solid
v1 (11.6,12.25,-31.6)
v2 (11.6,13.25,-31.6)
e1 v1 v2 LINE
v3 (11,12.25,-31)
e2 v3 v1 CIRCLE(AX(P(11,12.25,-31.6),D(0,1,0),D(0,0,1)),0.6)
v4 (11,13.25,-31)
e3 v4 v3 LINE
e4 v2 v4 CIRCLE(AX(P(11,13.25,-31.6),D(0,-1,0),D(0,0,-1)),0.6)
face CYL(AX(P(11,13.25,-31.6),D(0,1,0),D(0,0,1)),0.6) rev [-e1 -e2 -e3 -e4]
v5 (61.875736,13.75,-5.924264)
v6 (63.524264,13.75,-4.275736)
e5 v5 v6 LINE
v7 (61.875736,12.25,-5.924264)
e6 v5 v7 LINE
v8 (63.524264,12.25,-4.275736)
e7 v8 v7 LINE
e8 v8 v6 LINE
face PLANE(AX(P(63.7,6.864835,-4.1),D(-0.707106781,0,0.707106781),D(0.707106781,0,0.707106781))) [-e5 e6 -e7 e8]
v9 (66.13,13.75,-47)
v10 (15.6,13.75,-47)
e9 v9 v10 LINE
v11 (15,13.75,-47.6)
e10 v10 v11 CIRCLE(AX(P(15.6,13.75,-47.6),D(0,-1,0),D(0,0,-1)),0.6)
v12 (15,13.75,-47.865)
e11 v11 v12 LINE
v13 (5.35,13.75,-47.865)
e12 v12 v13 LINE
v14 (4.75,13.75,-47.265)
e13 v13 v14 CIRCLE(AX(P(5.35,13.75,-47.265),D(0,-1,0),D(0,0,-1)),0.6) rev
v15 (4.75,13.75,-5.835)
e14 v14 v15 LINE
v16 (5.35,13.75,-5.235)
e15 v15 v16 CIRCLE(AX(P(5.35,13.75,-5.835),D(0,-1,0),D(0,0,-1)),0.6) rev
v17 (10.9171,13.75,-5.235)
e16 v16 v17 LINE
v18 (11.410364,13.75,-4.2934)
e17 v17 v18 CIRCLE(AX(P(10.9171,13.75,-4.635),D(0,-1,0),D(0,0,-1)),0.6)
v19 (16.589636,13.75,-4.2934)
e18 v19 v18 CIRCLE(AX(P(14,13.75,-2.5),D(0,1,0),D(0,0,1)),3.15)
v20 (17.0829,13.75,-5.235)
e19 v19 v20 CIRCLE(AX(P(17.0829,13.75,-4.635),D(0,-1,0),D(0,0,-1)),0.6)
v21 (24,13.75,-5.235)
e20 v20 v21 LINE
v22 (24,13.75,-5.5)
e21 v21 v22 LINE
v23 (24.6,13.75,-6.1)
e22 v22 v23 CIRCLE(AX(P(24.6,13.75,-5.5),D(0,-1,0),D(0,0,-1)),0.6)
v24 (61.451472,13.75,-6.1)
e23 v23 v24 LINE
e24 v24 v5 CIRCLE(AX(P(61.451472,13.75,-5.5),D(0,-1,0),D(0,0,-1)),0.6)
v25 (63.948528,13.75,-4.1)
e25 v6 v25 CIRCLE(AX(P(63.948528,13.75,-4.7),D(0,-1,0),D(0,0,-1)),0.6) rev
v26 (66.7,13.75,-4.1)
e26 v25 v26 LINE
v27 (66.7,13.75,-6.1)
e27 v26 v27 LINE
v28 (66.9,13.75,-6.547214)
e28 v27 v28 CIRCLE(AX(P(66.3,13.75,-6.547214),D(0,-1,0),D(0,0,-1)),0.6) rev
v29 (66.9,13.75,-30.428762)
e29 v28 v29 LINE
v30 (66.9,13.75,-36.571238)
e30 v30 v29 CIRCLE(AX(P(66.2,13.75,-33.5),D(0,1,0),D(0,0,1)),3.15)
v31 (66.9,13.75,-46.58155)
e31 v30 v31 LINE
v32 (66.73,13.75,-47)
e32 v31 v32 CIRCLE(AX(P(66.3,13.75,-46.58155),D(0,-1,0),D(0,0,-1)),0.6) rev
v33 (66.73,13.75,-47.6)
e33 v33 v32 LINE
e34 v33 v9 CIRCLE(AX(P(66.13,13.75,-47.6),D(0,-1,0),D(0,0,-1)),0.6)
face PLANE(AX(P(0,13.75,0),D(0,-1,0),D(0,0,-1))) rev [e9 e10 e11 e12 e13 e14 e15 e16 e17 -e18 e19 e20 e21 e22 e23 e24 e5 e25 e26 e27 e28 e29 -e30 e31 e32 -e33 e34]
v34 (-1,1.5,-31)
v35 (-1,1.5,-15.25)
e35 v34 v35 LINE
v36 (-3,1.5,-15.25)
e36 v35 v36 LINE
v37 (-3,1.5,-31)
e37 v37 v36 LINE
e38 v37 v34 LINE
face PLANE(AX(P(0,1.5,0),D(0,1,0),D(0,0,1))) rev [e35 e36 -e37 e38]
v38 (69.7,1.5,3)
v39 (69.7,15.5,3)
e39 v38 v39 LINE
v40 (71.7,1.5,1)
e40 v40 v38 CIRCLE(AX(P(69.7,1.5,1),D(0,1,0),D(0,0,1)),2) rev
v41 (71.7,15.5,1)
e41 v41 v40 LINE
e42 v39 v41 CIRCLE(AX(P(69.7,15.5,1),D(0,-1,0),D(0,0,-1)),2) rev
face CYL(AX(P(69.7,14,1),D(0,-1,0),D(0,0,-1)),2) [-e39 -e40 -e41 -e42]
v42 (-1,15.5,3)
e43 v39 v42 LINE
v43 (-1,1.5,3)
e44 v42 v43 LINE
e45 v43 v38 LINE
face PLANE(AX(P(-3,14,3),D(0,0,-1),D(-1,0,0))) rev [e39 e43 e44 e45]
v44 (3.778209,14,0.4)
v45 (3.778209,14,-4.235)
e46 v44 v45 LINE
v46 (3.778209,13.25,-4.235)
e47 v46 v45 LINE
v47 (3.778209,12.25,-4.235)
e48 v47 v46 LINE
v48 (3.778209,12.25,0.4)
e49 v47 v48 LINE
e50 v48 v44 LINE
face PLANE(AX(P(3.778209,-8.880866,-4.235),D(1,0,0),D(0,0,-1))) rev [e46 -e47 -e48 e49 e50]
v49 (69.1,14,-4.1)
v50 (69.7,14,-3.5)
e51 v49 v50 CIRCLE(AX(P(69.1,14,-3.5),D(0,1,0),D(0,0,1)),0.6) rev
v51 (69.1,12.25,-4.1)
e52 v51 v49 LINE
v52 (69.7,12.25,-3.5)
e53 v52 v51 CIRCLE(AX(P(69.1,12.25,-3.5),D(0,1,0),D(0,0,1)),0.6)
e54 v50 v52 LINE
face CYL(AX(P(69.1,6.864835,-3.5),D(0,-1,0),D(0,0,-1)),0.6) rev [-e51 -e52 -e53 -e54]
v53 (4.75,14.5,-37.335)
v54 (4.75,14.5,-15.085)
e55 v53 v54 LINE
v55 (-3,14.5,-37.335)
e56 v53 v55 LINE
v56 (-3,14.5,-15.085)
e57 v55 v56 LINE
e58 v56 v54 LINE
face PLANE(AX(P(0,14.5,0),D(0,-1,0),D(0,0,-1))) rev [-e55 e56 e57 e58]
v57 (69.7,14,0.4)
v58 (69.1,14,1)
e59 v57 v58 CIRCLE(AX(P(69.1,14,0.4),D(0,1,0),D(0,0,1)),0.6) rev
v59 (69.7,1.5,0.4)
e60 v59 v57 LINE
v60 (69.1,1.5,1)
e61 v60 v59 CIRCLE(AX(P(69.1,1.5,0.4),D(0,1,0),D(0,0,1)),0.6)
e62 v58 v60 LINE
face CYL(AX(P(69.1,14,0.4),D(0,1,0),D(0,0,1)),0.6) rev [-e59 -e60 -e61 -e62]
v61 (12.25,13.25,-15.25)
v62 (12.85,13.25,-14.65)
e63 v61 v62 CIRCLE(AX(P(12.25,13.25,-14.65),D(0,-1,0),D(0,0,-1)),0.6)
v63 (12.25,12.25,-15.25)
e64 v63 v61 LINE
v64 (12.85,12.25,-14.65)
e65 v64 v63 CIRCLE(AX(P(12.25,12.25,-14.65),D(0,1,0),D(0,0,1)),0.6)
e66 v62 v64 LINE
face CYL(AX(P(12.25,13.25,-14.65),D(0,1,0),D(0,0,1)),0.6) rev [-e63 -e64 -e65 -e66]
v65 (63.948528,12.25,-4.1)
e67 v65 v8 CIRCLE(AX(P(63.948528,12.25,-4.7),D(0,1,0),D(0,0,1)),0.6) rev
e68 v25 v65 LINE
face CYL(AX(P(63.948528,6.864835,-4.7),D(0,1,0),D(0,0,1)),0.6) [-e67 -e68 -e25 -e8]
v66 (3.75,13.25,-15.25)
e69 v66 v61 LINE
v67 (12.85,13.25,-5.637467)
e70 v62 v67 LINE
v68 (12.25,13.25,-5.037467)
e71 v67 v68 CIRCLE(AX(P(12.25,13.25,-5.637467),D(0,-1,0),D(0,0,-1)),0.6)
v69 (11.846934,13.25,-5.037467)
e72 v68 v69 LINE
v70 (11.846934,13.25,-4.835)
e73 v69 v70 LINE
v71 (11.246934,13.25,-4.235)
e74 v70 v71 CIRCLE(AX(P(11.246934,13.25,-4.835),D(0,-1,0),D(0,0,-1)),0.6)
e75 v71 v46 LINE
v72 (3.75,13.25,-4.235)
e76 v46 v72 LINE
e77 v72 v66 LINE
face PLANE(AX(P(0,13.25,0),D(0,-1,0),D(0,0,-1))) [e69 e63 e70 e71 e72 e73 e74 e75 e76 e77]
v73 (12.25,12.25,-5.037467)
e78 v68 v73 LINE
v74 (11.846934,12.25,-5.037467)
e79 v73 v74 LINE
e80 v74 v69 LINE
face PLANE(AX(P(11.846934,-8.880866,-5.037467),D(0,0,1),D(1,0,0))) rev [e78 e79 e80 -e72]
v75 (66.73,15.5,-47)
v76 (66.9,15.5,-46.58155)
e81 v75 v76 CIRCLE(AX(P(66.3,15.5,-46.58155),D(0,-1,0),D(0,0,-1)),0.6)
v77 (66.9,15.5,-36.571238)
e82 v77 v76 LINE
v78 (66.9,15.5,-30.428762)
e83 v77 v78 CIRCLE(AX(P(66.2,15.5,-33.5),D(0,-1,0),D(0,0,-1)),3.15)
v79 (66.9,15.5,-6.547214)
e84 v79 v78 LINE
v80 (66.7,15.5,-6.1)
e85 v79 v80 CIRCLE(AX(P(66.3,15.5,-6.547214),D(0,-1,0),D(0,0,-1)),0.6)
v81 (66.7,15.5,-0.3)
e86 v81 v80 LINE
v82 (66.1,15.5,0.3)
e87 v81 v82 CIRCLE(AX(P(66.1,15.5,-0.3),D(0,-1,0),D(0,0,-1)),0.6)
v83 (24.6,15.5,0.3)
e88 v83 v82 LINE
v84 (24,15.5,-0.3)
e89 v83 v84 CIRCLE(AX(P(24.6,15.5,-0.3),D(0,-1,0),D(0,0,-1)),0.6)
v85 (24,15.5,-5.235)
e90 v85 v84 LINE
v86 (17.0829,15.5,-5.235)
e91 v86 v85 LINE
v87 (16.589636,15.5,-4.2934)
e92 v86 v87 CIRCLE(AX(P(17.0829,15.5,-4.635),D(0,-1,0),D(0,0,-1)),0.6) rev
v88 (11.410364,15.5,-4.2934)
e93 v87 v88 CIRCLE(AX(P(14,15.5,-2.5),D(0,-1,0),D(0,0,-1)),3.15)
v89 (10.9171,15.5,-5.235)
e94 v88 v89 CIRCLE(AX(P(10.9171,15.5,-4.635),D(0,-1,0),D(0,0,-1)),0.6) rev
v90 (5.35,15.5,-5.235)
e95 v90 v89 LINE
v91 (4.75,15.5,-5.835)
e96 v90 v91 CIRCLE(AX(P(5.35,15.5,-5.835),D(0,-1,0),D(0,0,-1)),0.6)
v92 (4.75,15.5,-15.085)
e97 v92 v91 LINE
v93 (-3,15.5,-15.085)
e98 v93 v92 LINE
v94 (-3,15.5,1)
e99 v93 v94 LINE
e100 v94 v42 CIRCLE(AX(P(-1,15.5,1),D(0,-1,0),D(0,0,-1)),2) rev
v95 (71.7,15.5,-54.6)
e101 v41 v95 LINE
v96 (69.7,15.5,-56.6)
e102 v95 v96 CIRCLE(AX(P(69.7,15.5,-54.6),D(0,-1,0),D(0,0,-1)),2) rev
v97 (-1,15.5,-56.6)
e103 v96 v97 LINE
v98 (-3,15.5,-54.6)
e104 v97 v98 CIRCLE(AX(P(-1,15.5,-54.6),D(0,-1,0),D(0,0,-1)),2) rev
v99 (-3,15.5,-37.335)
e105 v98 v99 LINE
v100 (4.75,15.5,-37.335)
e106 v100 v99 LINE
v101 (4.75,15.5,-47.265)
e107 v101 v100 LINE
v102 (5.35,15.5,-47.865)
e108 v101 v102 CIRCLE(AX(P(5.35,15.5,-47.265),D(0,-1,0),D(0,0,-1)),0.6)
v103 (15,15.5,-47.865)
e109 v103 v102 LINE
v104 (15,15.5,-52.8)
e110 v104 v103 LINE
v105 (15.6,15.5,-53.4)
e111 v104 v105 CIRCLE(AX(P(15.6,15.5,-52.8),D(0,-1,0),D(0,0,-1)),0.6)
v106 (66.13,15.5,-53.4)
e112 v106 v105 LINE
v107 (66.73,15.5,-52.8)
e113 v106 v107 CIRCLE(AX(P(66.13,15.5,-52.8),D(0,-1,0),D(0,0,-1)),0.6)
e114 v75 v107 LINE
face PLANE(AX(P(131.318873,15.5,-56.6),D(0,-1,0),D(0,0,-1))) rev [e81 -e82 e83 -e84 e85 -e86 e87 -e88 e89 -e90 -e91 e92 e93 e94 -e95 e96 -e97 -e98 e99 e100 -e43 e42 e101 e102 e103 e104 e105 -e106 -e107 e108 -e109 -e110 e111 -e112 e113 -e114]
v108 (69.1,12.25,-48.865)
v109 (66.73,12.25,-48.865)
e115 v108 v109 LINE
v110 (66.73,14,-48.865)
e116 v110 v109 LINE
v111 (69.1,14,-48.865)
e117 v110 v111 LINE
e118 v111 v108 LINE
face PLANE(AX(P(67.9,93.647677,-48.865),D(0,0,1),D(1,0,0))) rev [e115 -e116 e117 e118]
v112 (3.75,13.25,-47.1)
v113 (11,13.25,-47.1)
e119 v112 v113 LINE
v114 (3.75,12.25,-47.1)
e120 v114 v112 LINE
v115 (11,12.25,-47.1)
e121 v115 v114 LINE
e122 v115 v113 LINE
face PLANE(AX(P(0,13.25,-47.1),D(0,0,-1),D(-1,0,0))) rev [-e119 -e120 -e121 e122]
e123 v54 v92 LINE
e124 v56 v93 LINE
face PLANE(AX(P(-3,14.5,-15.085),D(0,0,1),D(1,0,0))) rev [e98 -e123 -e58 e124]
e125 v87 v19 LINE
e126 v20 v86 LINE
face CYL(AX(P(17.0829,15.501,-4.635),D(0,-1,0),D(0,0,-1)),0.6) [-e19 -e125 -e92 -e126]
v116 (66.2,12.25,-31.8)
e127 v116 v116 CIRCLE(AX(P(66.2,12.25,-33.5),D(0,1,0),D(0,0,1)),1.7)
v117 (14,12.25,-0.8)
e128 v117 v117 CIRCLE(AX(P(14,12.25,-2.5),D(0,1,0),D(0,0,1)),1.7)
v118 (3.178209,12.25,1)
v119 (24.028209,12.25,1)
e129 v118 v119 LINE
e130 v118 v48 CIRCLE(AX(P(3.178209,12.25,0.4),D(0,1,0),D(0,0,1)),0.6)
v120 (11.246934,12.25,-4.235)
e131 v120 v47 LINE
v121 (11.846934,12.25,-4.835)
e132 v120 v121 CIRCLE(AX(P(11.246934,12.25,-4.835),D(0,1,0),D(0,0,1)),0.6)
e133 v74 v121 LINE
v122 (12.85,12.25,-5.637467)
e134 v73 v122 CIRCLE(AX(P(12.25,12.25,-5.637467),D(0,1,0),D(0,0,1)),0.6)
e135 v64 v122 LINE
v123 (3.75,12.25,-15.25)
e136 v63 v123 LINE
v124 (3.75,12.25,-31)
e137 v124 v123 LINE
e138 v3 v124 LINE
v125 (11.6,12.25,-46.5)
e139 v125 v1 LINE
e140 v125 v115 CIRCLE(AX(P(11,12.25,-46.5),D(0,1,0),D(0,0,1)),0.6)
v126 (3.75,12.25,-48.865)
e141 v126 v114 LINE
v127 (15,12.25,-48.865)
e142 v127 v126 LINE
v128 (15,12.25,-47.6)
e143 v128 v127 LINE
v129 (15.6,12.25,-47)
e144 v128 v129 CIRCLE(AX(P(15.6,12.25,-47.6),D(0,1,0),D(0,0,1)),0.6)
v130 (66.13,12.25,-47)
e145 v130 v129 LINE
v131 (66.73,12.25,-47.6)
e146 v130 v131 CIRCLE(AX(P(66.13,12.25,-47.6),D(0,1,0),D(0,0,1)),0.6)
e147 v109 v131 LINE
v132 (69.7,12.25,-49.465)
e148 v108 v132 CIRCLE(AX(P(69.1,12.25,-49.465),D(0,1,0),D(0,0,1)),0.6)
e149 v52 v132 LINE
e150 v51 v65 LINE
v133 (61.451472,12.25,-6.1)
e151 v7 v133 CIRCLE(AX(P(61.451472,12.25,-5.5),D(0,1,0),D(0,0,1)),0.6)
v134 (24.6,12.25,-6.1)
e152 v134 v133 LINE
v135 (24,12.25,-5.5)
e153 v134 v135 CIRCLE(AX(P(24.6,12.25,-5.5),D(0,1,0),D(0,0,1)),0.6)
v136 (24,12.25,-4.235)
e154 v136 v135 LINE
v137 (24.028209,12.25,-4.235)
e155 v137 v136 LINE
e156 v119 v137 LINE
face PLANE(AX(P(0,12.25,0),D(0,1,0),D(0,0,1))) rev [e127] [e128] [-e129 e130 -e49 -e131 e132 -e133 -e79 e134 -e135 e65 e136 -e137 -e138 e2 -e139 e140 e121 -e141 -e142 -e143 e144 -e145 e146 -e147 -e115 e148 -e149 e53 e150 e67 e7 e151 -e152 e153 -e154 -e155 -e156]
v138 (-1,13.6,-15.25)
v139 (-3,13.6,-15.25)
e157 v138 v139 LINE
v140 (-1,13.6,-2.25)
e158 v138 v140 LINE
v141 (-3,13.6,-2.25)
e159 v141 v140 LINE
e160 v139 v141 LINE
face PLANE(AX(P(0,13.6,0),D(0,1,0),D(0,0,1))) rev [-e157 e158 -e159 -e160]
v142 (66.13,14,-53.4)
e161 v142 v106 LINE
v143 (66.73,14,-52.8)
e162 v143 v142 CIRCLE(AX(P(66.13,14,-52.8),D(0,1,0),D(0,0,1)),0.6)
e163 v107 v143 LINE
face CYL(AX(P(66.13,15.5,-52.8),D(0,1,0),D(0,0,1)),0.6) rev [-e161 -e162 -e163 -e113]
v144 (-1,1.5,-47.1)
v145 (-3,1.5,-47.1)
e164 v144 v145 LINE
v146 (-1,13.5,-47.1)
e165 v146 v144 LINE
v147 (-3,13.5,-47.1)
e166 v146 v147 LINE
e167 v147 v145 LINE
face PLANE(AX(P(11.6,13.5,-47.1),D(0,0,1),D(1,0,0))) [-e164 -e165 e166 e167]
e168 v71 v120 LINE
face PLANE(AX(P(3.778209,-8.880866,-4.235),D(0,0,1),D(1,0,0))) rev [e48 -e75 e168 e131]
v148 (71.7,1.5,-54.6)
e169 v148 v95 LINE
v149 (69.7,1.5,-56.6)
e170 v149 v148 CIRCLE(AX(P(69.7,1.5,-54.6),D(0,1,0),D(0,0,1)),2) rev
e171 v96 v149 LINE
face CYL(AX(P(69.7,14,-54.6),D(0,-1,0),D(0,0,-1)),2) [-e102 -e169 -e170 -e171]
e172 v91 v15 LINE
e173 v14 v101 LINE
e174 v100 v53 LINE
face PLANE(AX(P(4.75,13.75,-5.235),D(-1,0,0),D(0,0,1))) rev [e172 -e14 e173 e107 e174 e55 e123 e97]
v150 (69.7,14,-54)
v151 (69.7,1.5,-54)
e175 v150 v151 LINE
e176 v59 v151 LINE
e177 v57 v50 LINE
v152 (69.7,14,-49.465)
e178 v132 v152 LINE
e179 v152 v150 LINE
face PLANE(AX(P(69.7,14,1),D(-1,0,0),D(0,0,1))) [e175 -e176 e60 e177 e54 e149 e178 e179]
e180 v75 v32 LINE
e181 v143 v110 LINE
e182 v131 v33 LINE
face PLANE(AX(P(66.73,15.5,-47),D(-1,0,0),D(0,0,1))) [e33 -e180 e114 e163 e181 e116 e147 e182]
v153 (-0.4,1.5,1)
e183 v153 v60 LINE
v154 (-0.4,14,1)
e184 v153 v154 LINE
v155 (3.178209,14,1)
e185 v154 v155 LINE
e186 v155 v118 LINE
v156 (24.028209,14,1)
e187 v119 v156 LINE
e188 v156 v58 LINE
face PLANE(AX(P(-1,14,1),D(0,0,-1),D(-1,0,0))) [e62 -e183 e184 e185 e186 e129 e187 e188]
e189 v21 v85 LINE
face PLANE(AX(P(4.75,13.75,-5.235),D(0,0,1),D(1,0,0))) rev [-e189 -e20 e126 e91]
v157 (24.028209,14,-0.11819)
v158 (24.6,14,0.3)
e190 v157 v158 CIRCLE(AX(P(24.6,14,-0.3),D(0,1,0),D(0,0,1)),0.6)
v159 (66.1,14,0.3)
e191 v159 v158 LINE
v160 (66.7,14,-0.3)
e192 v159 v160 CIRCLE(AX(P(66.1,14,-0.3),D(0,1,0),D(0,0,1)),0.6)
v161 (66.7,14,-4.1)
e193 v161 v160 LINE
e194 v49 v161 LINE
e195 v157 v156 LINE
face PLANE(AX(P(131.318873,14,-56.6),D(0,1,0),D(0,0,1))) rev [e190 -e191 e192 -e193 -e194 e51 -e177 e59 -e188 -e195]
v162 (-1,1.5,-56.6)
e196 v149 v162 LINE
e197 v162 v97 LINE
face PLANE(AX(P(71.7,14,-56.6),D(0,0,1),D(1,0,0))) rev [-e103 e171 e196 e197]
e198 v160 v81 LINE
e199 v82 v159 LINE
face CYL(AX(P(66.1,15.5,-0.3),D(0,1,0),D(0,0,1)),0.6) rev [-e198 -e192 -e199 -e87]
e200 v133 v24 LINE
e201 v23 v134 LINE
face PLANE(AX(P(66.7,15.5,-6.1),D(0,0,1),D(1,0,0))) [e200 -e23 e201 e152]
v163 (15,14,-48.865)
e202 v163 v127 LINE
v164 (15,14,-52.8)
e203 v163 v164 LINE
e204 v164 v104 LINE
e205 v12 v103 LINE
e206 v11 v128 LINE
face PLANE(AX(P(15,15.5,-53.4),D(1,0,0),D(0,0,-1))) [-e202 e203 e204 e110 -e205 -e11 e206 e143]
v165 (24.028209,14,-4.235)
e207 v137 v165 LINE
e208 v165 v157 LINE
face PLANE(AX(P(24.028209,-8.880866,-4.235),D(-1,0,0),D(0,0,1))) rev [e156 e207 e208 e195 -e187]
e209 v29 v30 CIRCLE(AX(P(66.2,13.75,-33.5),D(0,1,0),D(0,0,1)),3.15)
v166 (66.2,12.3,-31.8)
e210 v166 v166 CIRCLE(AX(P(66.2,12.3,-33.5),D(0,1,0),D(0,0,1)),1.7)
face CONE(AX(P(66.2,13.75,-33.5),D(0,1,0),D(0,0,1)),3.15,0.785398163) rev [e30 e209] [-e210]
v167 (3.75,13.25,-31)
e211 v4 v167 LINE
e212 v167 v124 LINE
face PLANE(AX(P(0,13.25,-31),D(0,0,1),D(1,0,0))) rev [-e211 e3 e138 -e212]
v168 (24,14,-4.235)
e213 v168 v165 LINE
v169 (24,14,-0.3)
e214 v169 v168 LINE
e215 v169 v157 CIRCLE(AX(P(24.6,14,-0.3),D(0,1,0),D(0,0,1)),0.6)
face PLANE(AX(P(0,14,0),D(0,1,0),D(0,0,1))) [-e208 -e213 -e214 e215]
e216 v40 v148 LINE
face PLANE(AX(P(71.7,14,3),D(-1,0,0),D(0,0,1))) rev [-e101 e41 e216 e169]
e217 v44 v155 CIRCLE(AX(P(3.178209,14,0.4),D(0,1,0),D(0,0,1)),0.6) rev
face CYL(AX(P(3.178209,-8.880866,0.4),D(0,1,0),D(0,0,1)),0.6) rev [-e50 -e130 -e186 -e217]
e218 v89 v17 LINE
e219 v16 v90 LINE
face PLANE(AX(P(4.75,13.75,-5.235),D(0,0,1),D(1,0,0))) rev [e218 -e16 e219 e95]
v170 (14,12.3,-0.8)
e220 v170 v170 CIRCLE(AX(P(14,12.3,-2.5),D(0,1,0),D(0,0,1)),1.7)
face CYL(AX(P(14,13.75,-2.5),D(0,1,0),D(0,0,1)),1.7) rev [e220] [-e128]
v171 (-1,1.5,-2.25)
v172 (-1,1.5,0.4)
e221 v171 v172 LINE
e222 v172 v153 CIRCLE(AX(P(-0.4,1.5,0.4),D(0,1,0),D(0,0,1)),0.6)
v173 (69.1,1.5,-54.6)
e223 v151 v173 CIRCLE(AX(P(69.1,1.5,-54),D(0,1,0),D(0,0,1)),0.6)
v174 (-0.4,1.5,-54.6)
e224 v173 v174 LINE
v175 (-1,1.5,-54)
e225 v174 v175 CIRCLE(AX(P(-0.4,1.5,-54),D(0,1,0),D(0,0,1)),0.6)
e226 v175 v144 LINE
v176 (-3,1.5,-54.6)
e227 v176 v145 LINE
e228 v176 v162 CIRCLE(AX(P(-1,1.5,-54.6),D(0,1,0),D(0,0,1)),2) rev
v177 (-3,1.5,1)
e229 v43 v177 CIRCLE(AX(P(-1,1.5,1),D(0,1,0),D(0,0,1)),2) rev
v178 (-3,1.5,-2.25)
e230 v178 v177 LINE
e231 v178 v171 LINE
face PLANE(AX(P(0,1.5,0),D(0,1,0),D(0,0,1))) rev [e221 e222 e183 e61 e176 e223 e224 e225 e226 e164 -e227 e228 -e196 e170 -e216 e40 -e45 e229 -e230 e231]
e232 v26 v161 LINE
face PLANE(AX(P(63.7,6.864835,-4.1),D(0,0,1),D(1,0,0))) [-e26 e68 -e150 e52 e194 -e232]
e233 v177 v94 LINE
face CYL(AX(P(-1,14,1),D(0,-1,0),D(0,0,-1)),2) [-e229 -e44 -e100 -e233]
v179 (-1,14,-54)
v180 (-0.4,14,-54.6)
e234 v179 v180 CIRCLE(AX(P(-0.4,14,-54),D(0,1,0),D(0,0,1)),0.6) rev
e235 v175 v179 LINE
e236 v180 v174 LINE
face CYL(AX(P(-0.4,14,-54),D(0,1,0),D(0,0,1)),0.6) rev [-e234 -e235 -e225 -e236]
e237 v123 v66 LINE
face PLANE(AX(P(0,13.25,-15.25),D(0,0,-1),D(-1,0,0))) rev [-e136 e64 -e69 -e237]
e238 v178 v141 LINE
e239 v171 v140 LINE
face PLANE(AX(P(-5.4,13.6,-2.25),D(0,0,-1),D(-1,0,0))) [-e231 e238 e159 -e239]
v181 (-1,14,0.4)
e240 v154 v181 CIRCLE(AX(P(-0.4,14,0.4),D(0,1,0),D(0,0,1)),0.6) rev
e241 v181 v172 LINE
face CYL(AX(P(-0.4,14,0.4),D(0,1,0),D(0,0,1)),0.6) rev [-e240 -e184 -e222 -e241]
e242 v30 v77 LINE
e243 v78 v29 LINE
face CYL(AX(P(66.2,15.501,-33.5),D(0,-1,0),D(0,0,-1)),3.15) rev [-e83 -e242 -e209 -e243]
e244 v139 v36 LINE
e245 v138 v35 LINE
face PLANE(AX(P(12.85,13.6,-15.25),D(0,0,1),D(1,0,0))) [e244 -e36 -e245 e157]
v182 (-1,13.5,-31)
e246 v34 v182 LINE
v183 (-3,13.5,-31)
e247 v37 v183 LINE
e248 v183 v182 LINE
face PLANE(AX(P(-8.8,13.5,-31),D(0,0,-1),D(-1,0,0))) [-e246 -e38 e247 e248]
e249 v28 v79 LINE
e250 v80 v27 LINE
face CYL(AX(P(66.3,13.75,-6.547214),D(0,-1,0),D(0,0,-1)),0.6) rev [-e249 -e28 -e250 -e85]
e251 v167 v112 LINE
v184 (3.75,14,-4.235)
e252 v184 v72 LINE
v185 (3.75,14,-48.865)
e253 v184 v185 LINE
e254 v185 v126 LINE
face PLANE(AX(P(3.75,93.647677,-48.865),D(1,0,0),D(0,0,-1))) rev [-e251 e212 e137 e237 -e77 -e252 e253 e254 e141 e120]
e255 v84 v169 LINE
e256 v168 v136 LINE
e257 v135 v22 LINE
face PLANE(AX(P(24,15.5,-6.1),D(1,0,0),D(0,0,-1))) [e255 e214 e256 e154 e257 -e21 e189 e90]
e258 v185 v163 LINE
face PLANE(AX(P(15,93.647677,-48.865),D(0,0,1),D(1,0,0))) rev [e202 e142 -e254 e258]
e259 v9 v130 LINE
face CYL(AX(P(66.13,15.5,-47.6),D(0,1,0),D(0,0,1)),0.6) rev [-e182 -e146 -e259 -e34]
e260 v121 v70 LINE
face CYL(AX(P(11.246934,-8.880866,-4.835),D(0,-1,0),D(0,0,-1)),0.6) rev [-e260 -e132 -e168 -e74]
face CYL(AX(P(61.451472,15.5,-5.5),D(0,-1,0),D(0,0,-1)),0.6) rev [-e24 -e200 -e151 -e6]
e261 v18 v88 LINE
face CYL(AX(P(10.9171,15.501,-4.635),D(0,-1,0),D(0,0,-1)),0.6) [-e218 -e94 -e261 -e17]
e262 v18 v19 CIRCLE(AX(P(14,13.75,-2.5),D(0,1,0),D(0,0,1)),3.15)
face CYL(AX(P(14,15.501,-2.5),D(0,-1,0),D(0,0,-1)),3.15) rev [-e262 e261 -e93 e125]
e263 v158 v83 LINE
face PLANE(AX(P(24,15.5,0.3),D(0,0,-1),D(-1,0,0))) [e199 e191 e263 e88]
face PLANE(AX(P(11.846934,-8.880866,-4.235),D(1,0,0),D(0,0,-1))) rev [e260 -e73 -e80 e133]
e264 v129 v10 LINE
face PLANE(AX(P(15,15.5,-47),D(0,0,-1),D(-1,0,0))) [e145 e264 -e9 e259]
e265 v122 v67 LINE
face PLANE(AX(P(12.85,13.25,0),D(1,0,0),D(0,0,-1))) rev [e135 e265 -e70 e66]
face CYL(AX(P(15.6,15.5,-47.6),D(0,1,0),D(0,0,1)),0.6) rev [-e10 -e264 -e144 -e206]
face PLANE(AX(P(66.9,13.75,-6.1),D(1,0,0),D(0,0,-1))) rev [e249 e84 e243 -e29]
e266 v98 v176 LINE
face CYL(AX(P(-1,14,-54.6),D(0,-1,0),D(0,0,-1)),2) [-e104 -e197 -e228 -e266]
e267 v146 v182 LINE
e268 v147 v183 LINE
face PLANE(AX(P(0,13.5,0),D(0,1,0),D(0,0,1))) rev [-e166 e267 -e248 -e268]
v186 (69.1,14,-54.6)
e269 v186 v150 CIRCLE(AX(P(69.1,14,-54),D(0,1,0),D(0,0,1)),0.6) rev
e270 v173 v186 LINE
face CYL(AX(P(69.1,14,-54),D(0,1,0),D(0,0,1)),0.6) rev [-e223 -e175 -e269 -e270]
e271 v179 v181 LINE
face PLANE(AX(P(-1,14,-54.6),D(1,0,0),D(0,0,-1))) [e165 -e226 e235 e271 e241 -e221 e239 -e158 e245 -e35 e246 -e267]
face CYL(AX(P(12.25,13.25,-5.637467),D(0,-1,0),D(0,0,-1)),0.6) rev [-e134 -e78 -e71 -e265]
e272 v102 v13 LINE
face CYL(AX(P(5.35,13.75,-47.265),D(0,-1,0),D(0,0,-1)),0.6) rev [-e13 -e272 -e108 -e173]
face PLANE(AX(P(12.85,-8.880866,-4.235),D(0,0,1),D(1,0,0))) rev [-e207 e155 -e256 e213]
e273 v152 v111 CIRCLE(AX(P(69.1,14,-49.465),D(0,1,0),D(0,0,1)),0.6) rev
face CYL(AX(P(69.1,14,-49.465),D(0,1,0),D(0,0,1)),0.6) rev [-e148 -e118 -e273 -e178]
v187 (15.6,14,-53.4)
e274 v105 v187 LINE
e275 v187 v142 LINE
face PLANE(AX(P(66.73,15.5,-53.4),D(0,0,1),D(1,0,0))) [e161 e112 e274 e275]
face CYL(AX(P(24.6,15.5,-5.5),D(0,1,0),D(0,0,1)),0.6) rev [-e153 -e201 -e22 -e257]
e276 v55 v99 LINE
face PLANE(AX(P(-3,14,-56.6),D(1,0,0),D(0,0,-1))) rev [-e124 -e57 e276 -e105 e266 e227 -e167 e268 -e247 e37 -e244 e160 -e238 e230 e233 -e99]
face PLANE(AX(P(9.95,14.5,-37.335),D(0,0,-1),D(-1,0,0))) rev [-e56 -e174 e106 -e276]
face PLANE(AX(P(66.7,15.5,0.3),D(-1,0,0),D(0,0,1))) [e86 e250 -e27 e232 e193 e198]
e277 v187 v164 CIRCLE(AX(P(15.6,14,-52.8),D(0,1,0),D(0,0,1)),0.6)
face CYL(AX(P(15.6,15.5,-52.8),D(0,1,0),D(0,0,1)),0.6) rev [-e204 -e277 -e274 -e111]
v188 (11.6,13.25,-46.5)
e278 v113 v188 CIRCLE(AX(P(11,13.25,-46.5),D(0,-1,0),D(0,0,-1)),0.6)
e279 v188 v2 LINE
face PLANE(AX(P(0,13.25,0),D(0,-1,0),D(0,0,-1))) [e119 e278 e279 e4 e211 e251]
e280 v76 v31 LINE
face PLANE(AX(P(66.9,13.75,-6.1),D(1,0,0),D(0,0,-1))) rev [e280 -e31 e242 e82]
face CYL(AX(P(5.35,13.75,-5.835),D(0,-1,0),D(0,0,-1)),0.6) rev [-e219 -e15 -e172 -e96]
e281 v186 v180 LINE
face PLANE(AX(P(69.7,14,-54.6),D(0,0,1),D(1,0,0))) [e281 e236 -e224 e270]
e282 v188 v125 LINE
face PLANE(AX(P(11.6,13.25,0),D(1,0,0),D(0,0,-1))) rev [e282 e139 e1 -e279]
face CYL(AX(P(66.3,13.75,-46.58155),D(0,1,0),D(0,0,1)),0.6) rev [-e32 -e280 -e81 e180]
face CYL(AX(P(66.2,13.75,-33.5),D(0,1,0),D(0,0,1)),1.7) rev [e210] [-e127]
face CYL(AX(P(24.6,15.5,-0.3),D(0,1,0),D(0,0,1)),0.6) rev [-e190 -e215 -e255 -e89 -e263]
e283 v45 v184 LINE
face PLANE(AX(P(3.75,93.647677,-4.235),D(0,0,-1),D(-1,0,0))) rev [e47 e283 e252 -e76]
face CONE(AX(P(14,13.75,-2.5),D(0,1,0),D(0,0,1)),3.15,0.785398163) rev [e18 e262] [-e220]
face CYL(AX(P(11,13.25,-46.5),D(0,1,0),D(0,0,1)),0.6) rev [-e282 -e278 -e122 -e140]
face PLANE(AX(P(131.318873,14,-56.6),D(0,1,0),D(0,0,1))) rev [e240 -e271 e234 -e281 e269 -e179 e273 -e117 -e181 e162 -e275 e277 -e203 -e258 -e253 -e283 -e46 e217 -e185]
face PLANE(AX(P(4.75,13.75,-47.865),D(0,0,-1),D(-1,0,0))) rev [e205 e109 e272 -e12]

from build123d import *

# Parameters (mm, degrees)
WALLS_START                                    = 1.5
SKETCH2_W                                      = 74.7
SKETCH2_H                                      = 59.6
SKETCH2_W_2                                    = 70.7
SKETCH2_H_2                                    = 55.6
WALLS_DEPTH                                    = 12.5
BOSS_EXTRUDE2_START                            = -3
SKETCH3_W                                      = 59.6
SKETCH3_H                                      = 1.5
BOSS_EXTRUDE2_DEPTH                            = 74.7
SKETCH4_W                                      = 20.4
SKETCH4_H                                      = 16.1
CUT_EXTRUDE1_DEPTH                             = 12
SKETCH5_W                                      = 18.25
SKETCH5_H                                      = 13
CUT_EXTRUDE2_DEPTH                             = 12.1
SKETCH6_W                                      = 51.73
SKETCH6_H                                      = 6.4
SKETCH6_W_2                                    = 42.7
CUT_EXTRUDE3_DEPTH                             = 93.414555131
BOSS_EXTRUDE5_START                            = 2
BOSS_EXTRUDE5_DEPTH                            = 3.25
CUT_EXTRUDE6_DEPTH                             = 1.75
SKETCH16_W                                     = 12.95
SKETCH16_H                                     = 22.25
CUT_EXTRUDE7_DEPTH                             = 1
HOLE_PADDING_DEPTH                             = 1.5
ROOF_FILL_IN_DEPTH                             = 1.75
FILLET2_R                                      = 2
CUT_EXTRUDE9_START                             = 2
SKETCH18_W                                     = 20.4
SKETCH18_H                                     = 16.1
SKETCH18_W_2                                   = 18.25
SKETCH18_H_2                                   = 13
CUT_EXTRUDE9_DEPTH                             = 1
ROOF_FILL_IN_2_REACH                           = 94.199
CSK_FOR_M3_FLAT_HEAD_MACHINE_SCREW8_AT_2_COUNT = 2
CSK_FOR_M3_FLAT_HEAD_MACHINE_SCREW8_AT_2_PITCH = 60.711119245
HOLE_CLEARANCE_REACH                           = 94.166
SKETCH46_R                                     = 3.15
FILLET3_R                                      = 0.6


with BuildPart() as part:
    # Sketch2 → walls (new body)
    with BuildSketch(Plane(origin=(0, 0, 0), x_dir=(1, 0, 0), z_dir=(0, 1, 0)).offset(WALLS_START)):
        with Locations((34.35, 26.8)):
            Rectangle(SKETCH2_W, SKETCH2_H)
        with Locations((34.35, 26.8)):
            Rectangle(SKETCH2_W_2, SKETCH2_H_2, mode=Mode.SUBTRACT)
    extrude(amount=WALLS_DEPTH)

    # Sketch3 → Boss-Extrude2 (add)
    with BuildSketch(Plane(origin=(0, 0, 0), x_dir=(0, 0, -1), z_dir=(1, 0, 0)).offset(BOSS_EXTRUDE2_START)):
        with Locations((26.8, 14.75)):
            Rectangle(SKETCH3_W, SKETCH3_H)
    extrude(amount=BOSS_EXTRUDE2_DEPTH)

    # Sketch4 → Cut-Extrude1 (cut)
    with BuildSketch(Plane(origin=(0, 1.5, 0), x_dir=(1, 0, 0), z_dir=(0, 1, 0))):
        with Locations((1.4, 39.05)):
            Rectangle(SKETCH4_W, SKETCH4_H)
    extrude(amount=CUT_EXTRUDE1_DEPTH, mode=Mode.SUBTRACT)

    # Sketch5 → Cut-Extrude2 (cut)
    with BuildSketch(Plane(origin=(0, 1.5, 0), x_dir=(1, 0, 0), z_dir=(0, 1, 0))):
        with Locations((3.725, 8.75)):
            Rectangle(SKETCH5_W, SKETCH5_H)
    extrude(amount=CUT_EXTRUDE2_DEPTH, mode=Mode.SUBTRACT)

    # Sketch6 → Cut-Extrude3 (cut, through all)
    with BuildSketch(Plane(origin=(0, 1.5, 0), x_dir=(1, 0, 0), z_dir=(0, 1, 0))):
        with Locations((40.865, 50.2)):
            Rectangle(SKETCH6_W, SKETCH6_H)
        with Locations((45.35, 2.9)):
            Rectangle(SKETCH6_W_2, SKETCH6_H)
    extrude(amount=CUT_EXTRUDE3_DEPTH, mode=Mode.SUBTRACT)

    # Sketch13 → Boss-Extrude5 (add)
    with BuildSketch(Plane(origin=(0, 10.25, 0), x_dir=(1, 0, 0), z_dir=(0, 1, 0)).offset(BOSS_EXTRUDE5_START)):
        Polygon((3.75, 4.235), (24, 4.235), (24, 6.1), (66.7, 6.1), (66.7, 4.235), (67.9, 4.235), (67.9, 48.865), (66.73, 48.865), (66.73, 47), (15, 47), (15, 48.865), (3.75, 48.865), align=None)
    extrude(amount=BOSS_EXTRUDE5_DEPTH)

    # Sketch15 → Cut-Extrude6 (cut)
    with BuildSketch(Plane(origin=(0, 15.5, 0), x_dir=(1, 0, 0), z_dir=(0, 1, 0))):
        Polygon((4.75, 5.235), (24, 5.235), (24, 6.1), (66.9, 6.1), (66.9, 47), (15, 47), (15, 47.865), (4.75, 47.865), align=None)
    extrude(amount=-CUT_EXTRUDE6_DEPTH, mode=Mode.SUBTRACT)

    # Sketch16 → Cut-Extrude7 (cut)
    with BuildSketch(Plane(origin=(0, 15.5, 0), x_dir=(1, 0, 0), z_dir=(0, 1, 0))):
        with Locations((3.475, 26.21)):
            Rectangle(SKETCH16_W, SKETCH16_H)
    extrude(amount=-CUT_EXTRUDE7_DEPTH, mode=Mode.SUBTRACT)

    # Sketch45 → Hole padding (add)
    with BuildSketch(Plane(origin=(0, 13.75, 0), x_dir=(1, 0, 0), z_dir=(0, 1, 0))):
        Polygon((63.7, 4.1), (66.7, 4.1), (66.7, 6.1), (61.7, 6.1), align=None)
    extrude(amount=-HOLE_PADDING_DEPTH)

    # Sketch43 → Roof fill-in (add)
    with BuildSketch(Plane.XZ.offset(-14)):
        Polygon((67.9, -48.865), (67.9, -4.235), (66.7, -4.235), (66.7, -4.1), (67.9, -4.1), (69.7, -4.1), (69.7, -48.865), align=None)
    extrude(amount=ROOF_FILL_IN_DEPTH)

    # Fillet2
    fillet2_edges = [part.edges().sort_by_distance(p)[0] for p in [
        (71.7, 8.5, -56.6),
        (71.7, 8.5, 3),
        (-3, 8.5, 3),
        (-3, 8.5, -56.6),
    ]]
    fillet(fillet2_edges, radius=FILLET2_R)

    # Sketch18 → Cut-Extrude9 (cut)
    with BuildSketch(Plane(origin=(0, 10.25, 0), x_dir=(1, 0, 0), z_dir=(0, 1, 0)).offset(CUT_EXTRUDE9_START)):
        with Locations((1.4, 39.05)):
            Rectangle(SKETCH18_W, SKETCH18_H)
        with Locations((3.725, 8.75)):
            Rectangle(SKETCH18_W_2, SKETCH18_H_2)
    extrude(amount=CUT_EXTRUDE9_DEPTH, mode=Mode.SUBTRACT)

    # Roof fill in 2: up to this face of the body (flat: up to its plane)
    roof_fill_in_2_end = Plane(part.part.faces().sort_by_distance((38.949640059, 12.25, -26.379272671))[0])
    # Sketch47 → Roof fill in 2 (add, up to the picked face)
    with BuildSketch(Plane.XZ.offset(-14), mode=Mode.PRIVATE) as roof_fill_in_2_sk1:
        Polygon((3.778208992, -4.235), (11.846933601, -4.235), (11.846933601, -5.037467277), (12.85, -5.037467277), (12.85, -4.235), (24.028208992, -4.235), (24.028208992, 1), (3.778208992, 1), align=None)
    roof_fill_in_2_tool1 = split(extrude(roof_fill_in_2_sk1.sketch, amount=ROOF_FILL_IN_2_REACH, mode=Mode.PRIVATE), bisect_by=roof_fill_in_2_end, keep=Keep.BOTH, mode=Mode.PRIVATE)
    add(roof_fill_in_2_tool1.solids().sort_by(Axis((13.891493, 14, -1.640249), (0, -1, 0)))[0])

    # Sketch42 → CSK for M3 Flat Head Machine Screw8 (revolve, cut)
    with BuildSketch(Plane(origin=(66.2, 13.75, -33.5), x_dir=(0, 0, 1), z_dir=(1, 0, 0))):
        Polygon((0, 0), (0, 8.521463052), (1.7, 7.5), (1.7, 1.45), (3.15, 0), align=None)
    csk_for_m3_flat_head_machine_screw8 = revolve(axis=Axis((66.2, 20.1, -33.5), (0, -1, 0)), mode=Mode.SUBTRACT)

    # CSK for M3 Flat Head Machine Screw8 at 2: CSK for M3 Flat Head Machine Screw8 ×2
    with Locations(*[Vector(-0.8598095480534521, 0, 0.5106148657022418) * (i * CSK_FOR_M3_FLAT_HEAD_MACHINE_SCREW8_AT_2_PITCH) for i in range(1, CSK_FOR_M3_FLAT_HEAD_MACHINE_SCREW8_AT_2_COUNT)]):
        add(csk_for_m3_flat_head_machine_screw8, mode=Mode.SUBTRACT)

    # Sketch46 → Hole clearance (cut, up to next)
    with BuildSketch(Plane(origin=(0, 13.75, 0), x_dir=(1, 0, 0), z_dir=(0, 1, 0)), mode=Mode.PRIVATE) as hole_clearance_sk1:
        with Locations((66.2, 33.5)):
            Circle(SKETCH46_R)
    hole_clearance_tool1 = extrude(hole_clearance_sk1.sketch, amount=HOLE_CLEARANCE_REACH, mode=Mode.PRIVATE) & part.part
    # Sketch46 → Hole clearance (cut, up to next)
    with BuildSketch(Plane(origin=(0, 13.75, 0), x_dir=(1, 0, 0), z_dir=(0, 1, 0)), mode=Mode.PRIVATE) as hole_clearance_sk2:
        with Locations((14, 2.5)):
            Circle(SKETCH46_R)
    hole_clearance_tool2 = extrude(hole_clearance_sk2.sketch, amount=HOLE_CLEARANCE_REACH, mode=Mode.PRIVATE) & part.part
    add(hole_clearance_tool1.solids().sort_by_distance((66.2, 13.75, -33.5))[0], mode=Mode.SUBTRACT)
    add(hole_clearance_tool2.solids().sort_by_distance((14, 13.75, -2.5))[0], mode=Mode.SUBTRACT)

    # Fillet3
    # the kernel refuses this fillet: 0.6 mm, written as the material it adds along each edge
    with BuildSketch(Plane(origin=(69.7, 1.5, 1), x_dir=(-1, 0, 0), z_dir=(0, 1, 0)), Plane(origin=(-1, 1.5, 1), x_dir=(0, 0, -1), z_dir=(0, 1, 0))) as fillet3_piece_1:
        with BuildLine():
            CenterArc((FILLET3_R, -FILLET3_R), FILLET3_R, 90, 90)
            Line((0, -FILLET3_R), (0, 0))
            Line((0, 0), (FILLET3_R, 0))
        make_face()
    extrude(amount=14)
    with BuildSketch(Plane(origin=(-1, 1.5, -54.6), x_dir=(0, 0, 1), z_dir=(0, 1, 0)), Plane(origin=(69.7, 1.5, -54.6), x_dir=(-1, 0, 0), z_dir=(0, 1, 0))) as fillet3_piece_2:
        with BuildLine():
            CenterArc((FILLET3_R, FILLET3_R), FILLET3_R, 180, 90)
            Line((0, FILLET3_R), (0, 0))
            Line((0, 0), (FILLET3_R, 0))
        make_face()
    extrude(amount=14)
    with BuildSketch(Plane(origin=(12.85, 12.25, -15.25), x_dir=(0, 0, 1), z_dir=(0, 1, 0)), Plane(origin=(11.6, 12.25, -47.1), x_dir=(0, 0, 1), z_dir=(0, 1, 0)), Plane(origin=(11.6, 12.25, -31), x_dir=(-1, 0, 0), z_dir=(0, 1, 0))) as fillet3_piece_3:
        with BuildLine():
            CenterArc((FILLET3_R, -FILLET3_R), FILLET3_R, 90, 90)
            Line((0, -FILLET3_R), (0, 0))
            Line((0, 0), (FILLET3_R, 0))
        make_face()
    extrude(amount=1)
    with BuildSketch(Plane(origin=(66.9, 15.5, -6.1), x_dir=(0, 0, -1), z_dir=(0, -1, 0))) as fillet3_piece_4:
        with BuildLine():
            CenterArc((0.447213595, -0.6), FILLET3_R, 90, 48.189685102)
            Line((0, -0.2), (0, 0))
            Line((0, 0), (0.447213595, 0))
        make_face()
    extrude(amount=2.868033989)
    with BuildSketch(Plane(origin=(66.9, 15.5, -47), x_dir=(-1, 0, 0), z_dir=(0, -1, 0))) as fillet3_piece_5:
        with BuildLine():
            CenterArc((0.6, -0.418449519), FILLET3_R, 135.779955569, 44.220044431)
            Line((0, -0.418449519), (0, 0))
            Line((0, 0), (0.17, 0))
        make_face()
    extrude(amount=2.796123798)
    with BuildSketch(Plane(origin=(4.75, 15.5, -47.865), x_dir=(0, 0, 1), z_dir=(0, -1, 0)), Plane(origin=(69.7, 15.5, -48.865), x_dir=(0, 0, -1), z_dir=(0, -1, 0))) as fillet3_piece_6:
        with BuildLine():
            CenterArc((FILLET3_R, -FILLET3_R), FILLET3_R, 90, 90)
            Line((0, -FILLET3_R), (0, 0))
            Line((0, 0), (FILLET3_R, 0))
        make_face()
    extrude(amount=3.25)
    with BuildSketch(Plane(origin=(4.75, 15.5, -5.235), x_dir=(0, 0, -1), z_dir=(0, -1, 0))) as fillet3_piece_7_section:
        with BuildLine():
            CenterArc((FILLET3_R, FILLET3_R), FILLET3_R, 180, 90)
            Line((0, FILLET3_R), (0, 0))
            Line((0, 0), (FILLET3_R, 0))
        make_face()
    fillet3_piece_7 = extrude(amount=3.25, mode=Mode.PRIVATE)
    fillet3_piece_7 = split(fillet3_piece_7, bisect_by=Plane(origin=(4.75, 13.25, -5.235), z_dir=(0, 1, 0)), keep=Keep.TOP, mode=Mode.PRIVATE)
    add(fillet3_piece_7)
    with BuildSketch(Plane(origin=(24, 12.25, -6.1), x_dir=(0, 0, 1), z_dir=(0, 1, 0)), Plane(origin=(66.7, 14, 0.3), x_dir=(0, 0, -1), z_dir=(0, 1, 0)), Plane(origin=(24, 14, 0.3), x_dir=(1, 0, 0), z_dir=(0, 1, 0)), Plane(origin=(15, 14, -53.4), x_dir=(0, 0, 1), z_dir=(0, 1, 0)), Plane(origin=(66.73, 12.25, -47), x_dir=(0, 0, -1), z_dir=(0, 1, 0)), Plane(origin=(66.73, 14, -53.4), x_dir=(-1, 0, 0), z_dir=(0, 1, 0)), Plane(origin=(15, 13.75, -47), x_dir=(0, 0, -1), z_dir=(0, -1, 0))) as fillet3_piece_8:
        with BuildLine():
            CenterArc((FILLET3_R, FILLET3_R), FILLET3_R, 180, 90)
            Line((0, FILLET3_R), (0, 0))
            Line((0, 0), (FILLET3_R, 0))
        make_face()
    extrude(amount=1.5)
    with BuildSketch(Plane(origin=(11.846933601, 13.25, -4.235), x_dir=(-1, 0, 0), z_dir=(0, -1, 0)), Plane(origin=(12.85, 13.25, -5.037467277), x_dir=(-1, 0, 0), z_dir=(0, -1, 0))) as fillet3_piece_9:
        with BuildLine():
            CenterArc((FILLET3_R, FILLET3_R), FILLET3_R, 180, 90)
            Line((0, FILLET3_R), (0, 0))
            Line((0, 0), (FILLET3_R, 0))
        make_face()
    extrude(amount=1)
    with BuildSketch(Plane(origin=(61.7, 13.75, -6.1), x_dir=(-1, 0, 0), z_dir=(0, -1, 0))) as fillet3_piece_10:
        with BuildLine():
            CenterArc((FILLET3_R * 0.414213562373, -FILLET3_R), FILLET3_R, 90, 45)
            Line((-FILLET3_R * 0.292893218813, -FILLET3_R * 0.292893218813), (0, 0))
            Line((0, 0), (FILLET3_R * 0.414213562373, 0))
        make_face()
    extrude(amount=1.5)
    with BuildSketch(Plane(origin=(3.778208992, 15.5, 1), x_dir=(-1, 0, 0), z_dir=(0, -1, 0)), Plane(origin=(69.7, 15.5, -4.1), x_dir=(0, 0, 1), z_dir=(0, -1, 0))) as fillet3_piece_11:
        with BuildLine():
            CenterArc((FILLET3_R, FILLET3_R), FILLET3_R, 180, 90)
            Line((0, FILLET3_R), (0, 0))
            Line((0, 0), (FILLET3_R, 0))
        make_face()
    extrude(amount=3.25)
    # the kernel refuses this fillet: 0.6 mm, written as the material it takes off along each edge
    with BuildSketch(Plane(origin=(15.562777975, 19.300306112, -5.235), x_dir=(0.7370421688498962, 0, 0.6758467587678743), z_dir=(0, -1, 0))) as fillet3_2_piece_1:
        with BuildLine():
            CenterArc((1.525902399, -0.585144526), FILLET3_R, 102.776309415, 124.703750134)
            Line((1.120394344, -1.027369827), (0, 0))
            ThreePointArc((0, 0), (0.696607617, -0.077991239), (1.393215234, 0))
        make_face()
    extrude(amount=5.550306112, mode=Mode.SUBTRACT)
    with BuildSketch(Plane(origin=(12.437222025, 19.300306112, -5.235), x_dir=(-1, 0, 0), z_dir=(0, -1, 0))) as fillet3_2_piece_2:
        with BuildLine():
            CenterArc((1.520122445, -0.6), FILLET3_R, 90, 124.703750134)
            ThreePointArc((1.026858378, -0.9416), (0.566139315, -0.413317168), (0, 0))
            Line((0, 0), (1.520122445, 0))
        make_face()
    extrude(amount=5.550306112, mode=Mode.SUBTRACT)
    with BuildSketch(Plane(origin=(63.7, 14.371320344, -4.1), x_dir=(-0.7071067811865439, 0, -0.7071067811865511), z_dir=(0, -1, 0))) as fillet3_2_piece_3:
        with BuildLine():
            CenterArc((FILLET3_R * 0.414213562373, FILLET3_R), FILLET3_R, 225, 45)
            Line((-FILLET3_R * 0.292893218813, FILLET3_R * 0.292893218813), (0, 0))
            Line((0, 0), (FILLET3_R * 0.414213562373, 0))
        make_face()
    extrude(amount=2.742640687, mode=Mode.SUBTRACT)


solid = part.part
